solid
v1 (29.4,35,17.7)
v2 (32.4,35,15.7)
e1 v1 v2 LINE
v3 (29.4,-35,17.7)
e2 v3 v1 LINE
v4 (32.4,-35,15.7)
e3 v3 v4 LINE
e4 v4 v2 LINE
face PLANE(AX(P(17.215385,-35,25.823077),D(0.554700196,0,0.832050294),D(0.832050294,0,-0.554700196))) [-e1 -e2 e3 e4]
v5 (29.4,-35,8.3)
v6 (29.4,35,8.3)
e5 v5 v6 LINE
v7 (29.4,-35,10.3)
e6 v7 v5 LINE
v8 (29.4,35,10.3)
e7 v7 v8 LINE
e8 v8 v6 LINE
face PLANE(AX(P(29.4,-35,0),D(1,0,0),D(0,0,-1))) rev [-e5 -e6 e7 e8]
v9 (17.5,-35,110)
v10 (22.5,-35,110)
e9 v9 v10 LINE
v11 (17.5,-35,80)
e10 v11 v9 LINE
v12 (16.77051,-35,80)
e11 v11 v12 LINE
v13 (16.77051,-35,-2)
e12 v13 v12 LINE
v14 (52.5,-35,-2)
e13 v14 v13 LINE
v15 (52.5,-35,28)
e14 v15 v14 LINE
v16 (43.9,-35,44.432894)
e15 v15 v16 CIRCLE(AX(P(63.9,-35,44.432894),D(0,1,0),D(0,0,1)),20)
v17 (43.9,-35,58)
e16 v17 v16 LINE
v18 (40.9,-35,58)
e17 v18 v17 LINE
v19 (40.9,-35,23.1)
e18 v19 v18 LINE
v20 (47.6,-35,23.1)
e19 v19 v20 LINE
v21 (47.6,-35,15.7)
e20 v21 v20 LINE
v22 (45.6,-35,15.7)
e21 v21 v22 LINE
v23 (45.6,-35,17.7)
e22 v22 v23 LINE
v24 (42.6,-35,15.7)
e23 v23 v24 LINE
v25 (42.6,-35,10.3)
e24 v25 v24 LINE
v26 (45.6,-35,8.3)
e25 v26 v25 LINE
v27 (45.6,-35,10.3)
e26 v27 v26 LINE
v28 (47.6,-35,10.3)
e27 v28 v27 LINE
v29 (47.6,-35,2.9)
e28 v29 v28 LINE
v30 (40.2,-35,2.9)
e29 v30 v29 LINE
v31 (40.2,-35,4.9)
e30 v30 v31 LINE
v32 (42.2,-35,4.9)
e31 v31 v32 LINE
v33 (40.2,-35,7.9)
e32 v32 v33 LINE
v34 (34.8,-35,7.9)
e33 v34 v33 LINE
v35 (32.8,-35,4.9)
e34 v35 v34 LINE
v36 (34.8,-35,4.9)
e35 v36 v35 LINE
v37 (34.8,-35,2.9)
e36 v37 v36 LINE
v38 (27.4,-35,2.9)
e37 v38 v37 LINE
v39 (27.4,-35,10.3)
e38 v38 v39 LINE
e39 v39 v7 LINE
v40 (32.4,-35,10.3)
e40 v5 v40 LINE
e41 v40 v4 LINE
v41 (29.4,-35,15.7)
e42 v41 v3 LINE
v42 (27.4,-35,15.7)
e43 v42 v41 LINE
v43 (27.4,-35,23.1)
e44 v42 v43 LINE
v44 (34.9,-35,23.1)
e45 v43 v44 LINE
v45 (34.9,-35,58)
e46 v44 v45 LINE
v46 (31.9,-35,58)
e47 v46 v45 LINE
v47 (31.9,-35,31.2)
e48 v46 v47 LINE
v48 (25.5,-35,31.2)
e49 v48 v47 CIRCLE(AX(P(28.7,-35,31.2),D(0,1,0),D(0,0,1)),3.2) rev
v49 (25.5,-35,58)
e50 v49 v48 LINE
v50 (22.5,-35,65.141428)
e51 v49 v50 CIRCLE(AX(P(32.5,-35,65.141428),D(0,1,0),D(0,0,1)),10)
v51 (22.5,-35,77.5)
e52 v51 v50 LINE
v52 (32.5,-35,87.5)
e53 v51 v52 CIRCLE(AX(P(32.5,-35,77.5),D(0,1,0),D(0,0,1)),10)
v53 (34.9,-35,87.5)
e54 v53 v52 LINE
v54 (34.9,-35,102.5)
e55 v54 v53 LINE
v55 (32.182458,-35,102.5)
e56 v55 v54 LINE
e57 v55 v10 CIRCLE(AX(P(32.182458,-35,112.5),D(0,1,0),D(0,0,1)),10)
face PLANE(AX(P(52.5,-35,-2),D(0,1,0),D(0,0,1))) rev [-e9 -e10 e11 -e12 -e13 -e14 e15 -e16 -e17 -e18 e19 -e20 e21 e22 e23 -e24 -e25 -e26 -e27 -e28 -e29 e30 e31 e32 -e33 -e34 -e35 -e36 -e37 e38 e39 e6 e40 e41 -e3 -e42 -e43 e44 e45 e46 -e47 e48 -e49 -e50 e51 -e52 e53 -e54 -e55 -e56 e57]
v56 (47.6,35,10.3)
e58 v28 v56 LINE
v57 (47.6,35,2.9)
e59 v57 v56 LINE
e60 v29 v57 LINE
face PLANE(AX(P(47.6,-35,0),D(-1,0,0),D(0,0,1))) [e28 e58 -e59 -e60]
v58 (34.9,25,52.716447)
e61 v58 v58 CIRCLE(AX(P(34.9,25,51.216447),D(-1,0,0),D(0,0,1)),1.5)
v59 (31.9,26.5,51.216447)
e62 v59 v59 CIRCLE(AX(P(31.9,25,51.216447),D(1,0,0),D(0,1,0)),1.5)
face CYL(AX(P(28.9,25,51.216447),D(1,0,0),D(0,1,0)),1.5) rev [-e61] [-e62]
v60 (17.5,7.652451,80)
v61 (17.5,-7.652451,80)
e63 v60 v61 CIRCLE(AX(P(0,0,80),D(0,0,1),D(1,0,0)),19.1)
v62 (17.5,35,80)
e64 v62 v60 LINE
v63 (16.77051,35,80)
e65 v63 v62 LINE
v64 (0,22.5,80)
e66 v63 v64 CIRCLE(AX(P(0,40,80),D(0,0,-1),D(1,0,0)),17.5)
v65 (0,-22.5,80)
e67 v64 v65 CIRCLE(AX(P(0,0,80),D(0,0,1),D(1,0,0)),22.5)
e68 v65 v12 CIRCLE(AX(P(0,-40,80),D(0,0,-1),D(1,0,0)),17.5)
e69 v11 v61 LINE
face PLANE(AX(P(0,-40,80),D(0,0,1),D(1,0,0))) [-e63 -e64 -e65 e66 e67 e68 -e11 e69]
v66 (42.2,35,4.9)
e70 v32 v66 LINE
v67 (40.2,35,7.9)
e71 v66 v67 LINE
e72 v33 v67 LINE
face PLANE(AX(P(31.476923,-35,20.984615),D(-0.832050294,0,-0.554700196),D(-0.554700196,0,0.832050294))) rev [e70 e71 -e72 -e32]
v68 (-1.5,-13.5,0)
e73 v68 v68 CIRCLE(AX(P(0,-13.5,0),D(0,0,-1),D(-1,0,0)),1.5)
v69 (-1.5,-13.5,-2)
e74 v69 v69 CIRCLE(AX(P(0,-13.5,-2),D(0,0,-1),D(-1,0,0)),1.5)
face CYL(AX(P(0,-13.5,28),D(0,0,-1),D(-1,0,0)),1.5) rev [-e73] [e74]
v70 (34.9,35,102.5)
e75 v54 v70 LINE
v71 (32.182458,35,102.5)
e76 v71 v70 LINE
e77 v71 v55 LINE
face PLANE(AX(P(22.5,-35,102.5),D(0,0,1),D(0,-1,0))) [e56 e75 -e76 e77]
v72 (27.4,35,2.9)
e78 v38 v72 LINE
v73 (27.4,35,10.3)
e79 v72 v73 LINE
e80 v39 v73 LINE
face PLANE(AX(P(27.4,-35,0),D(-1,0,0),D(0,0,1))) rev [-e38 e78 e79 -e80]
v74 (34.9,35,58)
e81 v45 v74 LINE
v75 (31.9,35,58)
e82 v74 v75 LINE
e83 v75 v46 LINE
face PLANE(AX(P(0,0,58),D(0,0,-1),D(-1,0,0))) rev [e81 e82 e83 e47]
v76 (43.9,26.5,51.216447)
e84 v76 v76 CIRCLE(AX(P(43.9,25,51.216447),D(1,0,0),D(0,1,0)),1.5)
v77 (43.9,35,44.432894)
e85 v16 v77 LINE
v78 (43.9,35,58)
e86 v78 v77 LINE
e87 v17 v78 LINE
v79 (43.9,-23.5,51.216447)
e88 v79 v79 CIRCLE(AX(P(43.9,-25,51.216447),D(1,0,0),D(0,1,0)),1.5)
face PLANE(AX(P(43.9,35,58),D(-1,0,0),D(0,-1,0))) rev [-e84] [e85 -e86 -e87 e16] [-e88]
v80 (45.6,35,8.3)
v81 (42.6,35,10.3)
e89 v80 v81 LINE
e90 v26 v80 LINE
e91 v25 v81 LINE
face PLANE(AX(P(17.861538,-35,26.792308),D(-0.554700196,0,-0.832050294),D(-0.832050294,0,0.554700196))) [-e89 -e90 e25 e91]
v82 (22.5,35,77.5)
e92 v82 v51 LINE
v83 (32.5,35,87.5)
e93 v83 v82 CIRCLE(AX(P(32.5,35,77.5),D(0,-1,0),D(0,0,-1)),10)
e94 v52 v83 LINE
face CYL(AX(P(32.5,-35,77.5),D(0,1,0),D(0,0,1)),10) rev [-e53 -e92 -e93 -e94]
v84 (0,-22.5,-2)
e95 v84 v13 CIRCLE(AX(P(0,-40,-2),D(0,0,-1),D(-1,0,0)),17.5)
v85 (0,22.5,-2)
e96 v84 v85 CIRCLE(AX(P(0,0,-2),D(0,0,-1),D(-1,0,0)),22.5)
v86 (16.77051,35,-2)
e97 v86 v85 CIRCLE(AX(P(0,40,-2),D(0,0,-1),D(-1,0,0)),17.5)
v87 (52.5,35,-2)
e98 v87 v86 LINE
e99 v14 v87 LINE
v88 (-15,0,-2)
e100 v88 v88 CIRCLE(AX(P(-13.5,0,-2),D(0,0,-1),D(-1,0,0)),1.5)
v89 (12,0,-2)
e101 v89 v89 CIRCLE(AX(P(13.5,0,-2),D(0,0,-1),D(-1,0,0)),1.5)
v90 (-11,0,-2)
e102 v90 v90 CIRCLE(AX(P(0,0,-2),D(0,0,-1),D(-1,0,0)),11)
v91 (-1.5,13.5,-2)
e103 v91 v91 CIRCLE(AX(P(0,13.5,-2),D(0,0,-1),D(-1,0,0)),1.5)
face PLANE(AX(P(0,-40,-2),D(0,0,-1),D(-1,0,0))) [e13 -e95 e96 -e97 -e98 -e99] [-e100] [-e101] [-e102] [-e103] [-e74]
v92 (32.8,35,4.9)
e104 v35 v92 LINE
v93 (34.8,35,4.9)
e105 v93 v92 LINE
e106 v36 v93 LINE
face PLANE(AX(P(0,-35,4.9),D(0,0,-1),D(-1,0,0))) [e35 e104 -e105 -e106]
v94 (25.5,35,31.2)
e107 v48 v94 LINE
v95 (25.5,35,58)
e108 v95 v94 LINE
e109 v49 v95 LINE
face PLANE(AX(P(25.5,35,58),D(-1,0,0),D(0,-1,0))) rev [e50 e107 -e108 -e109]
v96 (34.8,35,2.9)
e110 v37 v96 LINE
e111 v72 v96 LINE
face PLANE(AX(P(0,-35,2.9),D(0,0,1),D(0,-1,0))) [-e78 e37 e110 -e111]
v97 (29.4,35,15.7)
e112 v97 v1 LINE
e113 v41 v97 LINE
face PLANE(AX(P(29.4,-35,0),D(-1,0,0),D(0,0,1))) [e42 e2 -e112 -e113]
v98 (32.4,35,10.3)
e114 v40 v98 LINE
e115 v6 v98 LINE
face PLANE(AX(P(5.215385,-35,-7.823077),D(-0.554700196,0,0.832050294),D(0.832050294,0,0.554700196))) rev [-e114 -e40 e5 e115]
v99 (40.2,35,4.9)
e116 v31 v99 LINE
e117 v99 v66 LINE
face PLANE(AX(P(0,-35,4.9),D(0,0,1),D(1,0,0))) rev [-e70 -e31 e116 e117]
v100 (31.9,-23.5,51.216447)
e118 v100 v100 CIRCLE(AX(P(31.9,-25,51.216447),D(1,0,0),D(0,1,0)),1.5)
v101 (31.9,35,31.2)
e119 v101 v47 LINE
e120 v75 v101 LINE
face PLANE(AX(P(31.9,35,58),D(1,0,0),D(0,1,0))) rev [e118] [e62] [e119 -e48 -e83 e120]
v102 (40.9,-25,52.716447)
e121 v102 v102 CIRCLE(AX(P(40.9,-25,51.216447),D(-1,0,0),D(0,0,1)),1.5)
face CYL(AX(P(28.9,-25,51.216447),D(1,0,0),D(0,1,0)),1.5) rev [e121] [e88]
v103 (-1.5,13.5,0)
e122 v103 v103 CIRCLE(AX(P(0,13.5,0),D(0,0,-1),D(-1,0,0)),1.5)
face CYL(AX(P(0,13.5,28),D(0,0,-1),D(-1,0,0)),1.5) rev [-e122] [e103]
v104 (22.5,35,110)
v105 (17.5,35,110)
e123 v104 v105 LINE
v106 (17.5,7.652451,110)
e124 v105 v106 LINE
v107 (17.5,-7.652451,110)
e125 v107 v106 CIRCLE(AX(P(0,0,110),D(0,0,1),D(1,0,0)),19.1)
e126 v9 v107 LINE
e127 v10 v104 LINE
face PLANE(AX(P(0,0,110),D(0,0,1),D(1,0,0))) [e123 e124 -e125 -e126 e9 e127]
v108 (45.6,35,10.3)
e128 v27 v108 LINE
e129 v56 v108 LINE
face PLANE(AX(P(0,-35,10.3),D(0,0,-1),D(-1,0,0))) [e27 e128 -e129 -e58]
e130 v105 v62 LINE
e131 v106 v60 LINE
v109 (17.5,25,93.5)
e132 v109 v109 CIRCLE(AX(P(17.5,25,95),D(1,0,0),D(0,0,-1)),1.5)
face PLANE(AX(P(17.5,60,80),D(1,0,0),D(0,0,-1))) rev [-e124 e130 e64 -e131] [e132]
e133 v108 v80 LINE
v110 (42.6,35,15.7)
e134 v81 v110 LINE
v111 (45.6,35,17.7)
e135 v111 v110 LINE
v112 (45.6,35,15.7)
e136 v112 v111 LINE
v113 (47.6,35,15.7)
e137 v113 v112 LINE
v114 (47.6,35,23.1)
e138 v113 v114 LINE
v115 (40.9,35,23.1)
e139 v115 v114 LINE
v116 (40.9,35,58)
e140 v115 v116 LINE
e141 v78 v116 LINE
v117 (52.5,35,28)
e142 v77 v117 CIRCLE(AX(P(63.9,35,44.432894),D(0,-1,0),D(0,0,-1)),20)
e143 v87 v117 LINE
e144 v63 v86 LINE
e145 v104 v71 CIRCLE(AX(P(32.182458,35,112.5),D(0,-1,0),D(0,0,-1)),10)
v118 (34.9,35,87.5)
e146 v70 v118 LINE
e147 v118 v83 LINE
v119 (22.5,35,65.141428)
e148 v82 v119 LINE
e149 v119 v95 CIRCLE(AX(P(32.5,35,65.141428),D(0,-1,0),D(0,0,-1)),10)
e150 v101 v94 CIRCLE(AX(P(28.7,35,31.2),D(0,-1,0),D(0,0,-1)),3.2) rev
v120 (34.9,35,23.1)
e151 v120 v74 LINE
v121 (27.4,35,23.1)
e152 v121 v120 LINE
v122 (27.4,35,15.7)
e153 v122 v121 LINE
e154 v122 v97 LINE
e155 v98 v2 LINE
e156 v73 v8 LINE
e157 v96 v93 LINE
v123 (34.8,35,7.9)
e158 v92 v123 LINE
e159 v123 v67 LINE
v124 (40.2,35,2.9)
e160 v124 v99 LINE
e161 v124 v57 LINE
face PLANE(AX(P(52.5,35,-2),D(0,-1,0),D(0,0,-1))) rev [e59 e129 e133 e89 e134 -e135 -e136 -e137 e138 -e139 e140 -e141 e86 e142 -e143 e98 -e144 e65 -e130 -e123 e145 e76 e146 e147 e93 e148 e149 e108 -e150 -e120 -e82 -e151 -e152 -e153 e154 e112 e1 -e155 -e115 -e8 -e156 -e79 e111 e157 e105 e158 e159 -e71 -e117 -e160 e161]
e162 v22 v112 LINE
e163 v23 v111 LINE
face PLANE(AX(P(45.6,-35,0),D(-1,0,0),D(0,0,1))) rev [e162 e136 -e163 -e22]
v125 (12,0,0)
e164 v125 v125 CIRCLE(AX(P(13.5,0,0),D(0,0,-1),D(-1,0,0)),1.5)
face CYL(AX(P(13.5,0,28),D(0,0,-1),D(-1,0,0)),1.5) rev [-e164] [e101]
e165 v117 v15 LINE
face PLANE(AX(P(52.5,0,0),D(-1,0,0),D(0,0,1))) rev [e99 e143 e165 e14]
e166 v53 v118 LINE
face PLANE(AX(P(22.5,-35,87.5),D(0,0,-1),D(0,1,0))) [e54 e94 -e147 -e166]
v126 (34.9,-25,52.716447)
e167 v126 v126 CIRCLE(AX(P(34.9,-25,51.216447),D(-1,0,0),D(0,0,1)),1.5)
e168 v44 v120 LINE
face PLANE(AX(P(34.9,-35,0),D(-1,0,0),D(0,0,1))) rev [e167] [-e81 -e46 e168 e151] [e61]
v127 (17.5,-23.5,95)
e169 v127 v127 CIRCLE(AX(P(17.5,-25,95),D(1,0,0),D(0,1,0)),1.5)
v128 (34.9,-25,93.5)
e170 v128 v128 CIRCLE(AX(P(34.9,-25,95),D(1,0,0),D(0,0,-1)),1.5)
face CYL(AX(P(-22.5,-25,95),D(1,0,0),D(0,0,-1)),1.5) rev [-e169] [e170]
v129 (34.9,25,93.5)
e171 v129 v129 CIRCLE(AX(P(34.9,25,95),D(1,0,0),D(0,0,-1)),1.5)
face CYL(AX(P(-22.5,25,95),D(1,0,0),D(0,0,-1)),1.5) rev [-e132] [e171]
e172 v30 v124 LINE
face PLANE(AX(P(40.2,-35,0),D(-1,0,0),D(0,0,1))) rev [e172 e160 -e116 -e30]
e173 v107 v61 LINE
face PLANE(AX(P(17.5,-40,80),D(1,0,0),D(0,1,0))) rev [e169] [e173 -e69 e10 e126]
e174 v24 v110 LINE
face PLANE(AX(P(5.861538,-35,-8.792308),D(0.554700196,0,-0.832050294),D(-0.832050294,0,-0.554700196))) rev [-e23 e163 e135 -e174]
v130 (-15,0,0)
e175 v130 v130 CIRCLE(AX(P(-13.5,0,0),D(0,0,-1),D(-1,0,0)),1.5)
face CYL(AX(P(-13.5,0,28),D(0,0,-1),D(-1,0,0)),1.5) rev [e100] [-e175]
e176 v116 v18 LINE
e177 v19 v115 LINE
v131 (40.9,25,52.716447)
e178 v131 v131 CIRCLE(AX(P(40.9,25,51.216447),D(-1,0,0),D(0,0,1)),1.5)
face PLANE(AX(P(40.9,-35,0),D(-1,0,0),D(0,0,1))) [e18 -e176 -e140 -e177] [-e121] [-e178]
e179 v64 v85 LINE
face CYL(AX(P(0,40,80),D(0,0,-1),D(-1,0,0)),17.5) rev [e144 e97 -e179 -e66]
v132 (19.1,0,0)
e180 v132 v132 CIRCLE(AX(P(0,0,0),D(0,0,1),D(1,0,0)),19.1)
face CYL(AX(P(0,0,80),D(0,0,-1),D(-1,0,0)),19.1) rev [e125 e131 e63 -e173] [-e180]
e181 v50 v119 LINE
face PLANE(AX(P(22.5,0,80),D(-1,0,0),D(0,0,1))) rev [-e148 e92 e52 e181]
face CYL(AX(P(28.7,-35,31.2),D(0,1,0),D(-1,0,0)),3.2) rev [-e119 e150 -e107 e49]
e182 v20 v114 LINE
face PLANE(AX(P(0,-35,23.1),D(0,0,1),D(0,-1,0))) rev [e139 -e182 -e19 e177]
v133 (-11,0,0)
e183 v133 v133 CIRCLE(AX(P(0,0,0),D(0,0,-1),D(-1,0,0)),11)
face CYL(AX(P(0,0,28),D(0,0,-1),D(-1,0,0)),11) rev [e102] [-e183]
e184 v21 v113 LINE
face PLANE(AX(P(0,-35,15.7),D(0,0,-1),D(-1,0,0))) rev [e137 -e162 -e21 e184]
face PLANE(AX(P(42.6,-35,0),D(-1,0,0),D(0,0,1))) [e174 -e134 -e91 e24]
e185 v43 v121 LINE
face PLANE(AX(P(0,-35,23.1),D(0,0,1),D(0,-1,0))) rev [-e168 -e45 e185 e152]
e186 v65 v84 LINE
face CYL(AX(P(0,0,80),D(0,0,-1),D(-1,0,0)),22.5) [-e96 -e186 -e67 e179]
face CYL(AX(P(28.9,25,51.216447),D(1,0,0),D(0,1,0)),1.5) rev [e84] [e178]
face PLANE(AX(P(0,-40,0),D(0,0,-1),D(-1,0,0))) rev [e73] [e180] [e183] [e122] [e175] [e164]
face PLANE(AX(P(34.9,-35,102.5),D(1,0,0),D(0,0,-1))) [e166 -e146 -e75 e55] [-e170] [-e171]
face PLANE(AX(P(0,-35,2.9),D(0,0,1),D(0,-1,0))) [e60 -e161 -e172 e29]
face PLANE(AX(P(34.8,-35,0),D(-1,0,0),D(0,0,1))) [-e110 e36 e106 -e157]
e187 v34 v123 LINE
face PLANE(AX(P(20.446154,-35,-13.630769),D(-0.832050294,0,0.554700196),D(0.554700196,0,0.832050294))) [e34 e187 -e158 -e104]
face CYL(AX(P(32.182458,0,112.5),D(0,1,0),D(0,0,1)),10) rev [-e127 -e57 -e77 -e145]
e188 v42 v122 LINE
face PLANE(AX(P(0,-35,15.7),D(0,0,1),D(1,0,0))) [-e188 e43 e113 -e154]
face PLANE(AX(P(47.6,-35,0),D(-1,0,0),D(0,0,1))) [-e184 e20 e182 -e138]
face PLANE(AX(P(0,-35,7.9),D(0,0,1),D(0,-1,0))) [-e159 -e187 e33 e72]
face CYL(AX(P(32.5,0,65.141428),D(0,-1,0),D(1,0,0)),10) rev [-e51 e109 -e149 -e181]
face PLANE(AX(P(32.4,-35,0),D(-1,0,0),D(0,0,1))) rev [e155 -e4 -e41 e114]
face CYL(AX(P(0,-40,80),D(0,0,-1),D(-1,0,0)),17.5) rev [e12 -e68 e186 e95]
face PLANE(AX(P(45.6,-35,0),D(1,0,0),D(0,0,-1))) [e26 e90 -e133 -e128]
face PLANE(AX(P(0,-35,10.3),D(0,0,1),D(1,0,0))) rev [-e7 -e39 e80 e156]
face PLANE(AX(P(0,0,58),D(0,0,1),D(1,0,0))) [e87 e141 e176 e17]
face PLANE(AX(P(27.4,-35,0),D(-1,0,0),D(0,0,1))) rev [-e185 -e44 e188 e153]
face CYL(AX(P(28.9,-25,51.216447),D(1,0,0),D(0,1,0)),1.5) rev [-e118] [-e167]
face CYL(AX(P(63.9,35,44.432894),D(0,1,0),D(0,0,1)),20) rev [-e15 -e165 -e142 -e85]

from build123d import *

# Parameters (mm, degrees)
SKETCH4_R            = 19.1
BOSS_EXTRUDE4_DEPTH  = 80
BOSS_EXTRUDE5_START  = 2
BOSS_EXTRUDE5_DEPTH  = 2
SKETCH6_R            = 5
CUT_EXTRUDE1_DEPTH   = 2
BOSS_EXTRUDE7_DEPTH  = 30
SKETCH8_R            = 11
CUT_EXTRUDE2_DEPTH   = 30
SKETCH9_R            = 1.5
CUT_EXTRUDE3_DEPTH   = 30
SKETCH11_W           = 5
SKETCH11_H           = 112
BOSS_EXTRUDE8_DEPTH  = 20
SKETCH12_W           = 5
SKETCH12_H           = 112
BOSS_EXTRUDE9_DEPTH  = 20
SKETCH13_R           = 1.5
CUT_EXTRUDE4_DEPTH   = 20
SKETCH14_R           = 1.5
CUT_EXTRUDE5_DEPTH   = 20
SKETCH16_W           = 30
SKETCH16_H           = 70
BOSS_EXTRUDE10_DEPTH = 30
SKETCH21_W           = 6
SKETCH21_H           = 4.9
CUT_EXTRUDE6_DEPTH   = 70
SKETCH23_W           = 3
SKETCH23_H           = 70
BOSS_EXTRUDE11_DEPTH = 30
FILLET5_R            = 3.2
FILLET6_R            = 20
SKETCH26_W           = 112
SKETCH26_H           = 40
CUT_EXTRUDE10_DEPTH  = 15
SKETCH27_W           = 6.865199721
SKETCH27_H           = 6.850856093
SKETCH27_W_2         = 7.923200186
SKETCH27_H_2         = 5.884780205
CUT_EXTRUDE11_DEPTH  = 131.000961535
SKETCH28_W           = 12.4
SKETCH28_H           = 15
BOSS_EXTRUDE12_DEPTH = 70
FILLET7_R            = 10
SKETCH29_R           = 1.5
CUT_EXTRUDE12_DEPTH  = 129.917648132
SKETCH30_R           = 1.5
CUT_EXTRUDE13_DEPTH  = 15
FILLET8_R            = 10


# Some blends are built 0.0001 mm under size
with BuildPart() as part:
    # Sketch4 → Boss-Extrude4 (new body)
    with BuildSketch(Plane.XY):
        with BuildLine():
            Line((22.5, 0), (22.5, -60))
            Line((22.5, -60), (17.5, -60))
            Line((17.5, -60), (17.5, -40))
            ThreePointArc((17.5, -40), (12.374368671, -27.625631329), (0, -22.5))
            ThreePointArc((0, -22.5), (-22.5, 0), (0, 22.5))
            ThreePointArc((0, 22.5), (12.374368671, 27.625631329), (17.5, 40))
            Line((17.5, 40), (17.5, 60))
            Line((17.5, 60), (22.5, 60))
            Line((22.5, 60), (22.5, 0))
        make_face()
        Circle(SKETCH4_R, mode=Mode.SUBTRACT)
    extrude(amount=BOSS_EXTRUDE4_DEPTH)

    # Sketch5 → Boss-Extrude5 (add)
    with BuildSketch(Plane(origin=(0, 0, 0), x_dir=(-1, 0, 0), z_dir=(0, 0, -1)).offset(BOSS_EXTRUDE5_START)):
        with BuildLine():
            Line((-17.5, 60), (-22.5, 60))
            Line((-22.5, 60), (-22.5, -60))
            Line((-22.5, -60), (-17.5, -60))
            Line((-17.5, -60), (-17.5, -40))
            ThreePointArc((-17.5, -40), (-12.374368671, -27.625631329), (0, -22.5))
            ThreePointArc((0, -22.5), (22.5, 0), (0, 22.5))
            ThreePointArc((0, 22.5), (-12.374368671, 27.625631329), (-17.5, 40))
            Line((-17.5, 40), (-17.5, 60))
        make_face()
    extrude(amount=-BOSS_EXTRUDE5_DEPTH)

    # Sketch6 → Cut-Extrude1 (cut)
    with BuildSketch(Plane(origin=(0, 0, -2), x_dir=(-1, 0, 0), z_dir=(0, 0, -1))):
        Circle(SKETCH6_R)
    extrude(amount=-CUT_EXTRUDE1_DEPTH, mode=Mode.SUBTRACT)

    # Sketch7 → Boss-Extrude7 (add)
    with BuildSketch(Plane.XY.offset(80)):
        with BuildLine():
            Line((17.5, 60), (17.5, 7.652450588))
            ThreePointArc((17.5, 7.652450588), (19.1, 0), (17.5, -7.652450588))
            Line((17.5, -7.652450588), (17.5, -60))
            Line((17.5, -60), (22.5, -60))
            Line((22.5, -60), (22.5, 60))
            Line((22.5, 60), (17.5, 60))
        make_face()
    extrude(amount=BOSS_EXTRUDE7_DEPTH)

    # Sketch8 → Cut-Extrude2 (cut)
    with BuildSketch(Plane(origin=(0, 0, -2), x_dir=(-1, 0, 0), z_dir=(0, 0, -1))):
        Circle(SKETCH8_R)
    extrude(amount=-CUT_EXTRUDE2_DEPTH, mode=Mode.SUBTRACT)

    # Sketch9 → Cut-Extrude3 (cut)
    with BuildSketch(Plane(origin=(0, 0, -2), x_dir=(-1, 0, 0), z_dir=(0, 0, -1))):
        with Locations((0, 13.5)):
            Circle(SKETCH9_R)
        with Locations((13.5, 0)):
            Circle(SKETCH9_R)
        with Locations((0, -13.5)):
            Circle(SKETCH9_R)
        with Locations((-13.5, 0)):
            Circle(SKETCH9_R)
    extrude(amount=-CUT_EXTRUDE3_DEPTH, mode=Mode.SUBTRACT)

    # Sketch11 → Boss-Extrude8 (add)
    with BuildSketch(Plane.XZ.offset(60)):
        with Locations((20, 54)):
            Rectangle(SKETCH11_W, SKETCH11_H)
    extrude(amount=BOSS_EXTRUDE8_DEPTH)

    # Sketch12 → Boss-Extrude9 (add)
    with BuildSketch(Plane(origin=(0, 60, 0), x_dir=(1, 0, 0), z_dir=(0, 1, 0))):
        with Locations((20, -54)):
            Rectangle(SKETCH12_W, SKETCH12_H)
    extrude(amount=BOSS_EXTRUDE9_DEPTH)

    # Sketch13 → Cut-Extrude4 (cut)
    with BuildSketch(Plane.ZY.offset(-17.5)):
        with Locations((26, 60)):
            Circle(SKETCH13_R)
        with Locations((54, 60)):
            Circle(SKETCH13_R)
        with Locations((82, 60)):
            Circle(SKETCH13_R)
        with Locations((82, -60)):
            Circle(SKETCH13_R)
        with Locations((54, -60)):
            Circle(SKETCH13_R)
        with Locations((26, -60)):
            Circle(SKETCH13_R)
    extrude(amount=-CUT_EXTRUDE4_DEPTH, mode=Mode.SUBTRACT)

    # Sketch14 → Cut-Extrude5 (cut)
    with BuildSketch(Plane.ZY.offset(-17.5)):
        with Locations((95, 37.652450588)):
            Circle(SKETCH14_R)
        with Locations((95, -37.652450588)):
            Circle(SKETCH14_R)
    extrude(amount=-CUT_EXTRUDE5_DEPTH, mode=Mode.SUBTRACT)

    # Sketch16 → Boss-Extrude10 (add)
    with BuildSketch(Plane(origin=(22.5, 0, 0), x_dir=(0, 0, -1), z_dir=(1, 0, 0))):
        with Locations((-13, 0)):
            Rectangle(SKETCH16_W, SKETCH16_H)
    extrude(amount=BOSS_EXTRUDE10_DEPTH)

    # Sketch21 → Cut-Extrude6 (cut)
    with BuildSketch(Plane(origin=(0, 35, 0), x_dir=(1, 0, 0), z_dir=(0, 1, 0))):
        Polygon((34.8, -2.9), (27.4, -2.9), (27.4, -10.3), (29.4, -10.3), (29.4, -8.3), (32.4, -10.3), (32.4, -15.7), (29.4, -17.7), (29.4, -15.7), (27.4, -15.7), (27.4, -23.1), (34.9, -23.1), (40.9, -23.1), (47.6, -23.1), (47.6, -15.7), (45.6, -15.7), (45.6, -17.7), (42.6, -15.7), (42.6, -10.3), (45.6, -8.3), (45.6, -10.3), (47.6, -10.3), (47.6, -2.9), (40.2, -2.9), (40.2, -4.9), (42.2, -4.9), (40.2, -7.9), (34.8, -7.9), (32.8, -4.9), (34.8, -4.9), align=None)
        with Locations((37.9, -25.55)):
            Rectangle(SKETCH21_W, SKETCH21_H)
    extrude(amount=-CUT_EXTRUDE6_DEPTH, mode=Mode.SUBTRACT)

    # Sketch23 → Boss-Extrude11 (add)
    with BuildSketch(Plane.XY.offset(28)):
        with Locations((42.4, 0)):
            Rectangle(SKETCH23_W, SKETCH23_H)
        with Locations((24, 0)):
            Rectangle(SKETCH23_W, SKETCH23_H)
        with Locations((33.4, 0)):
            Rectangle(SKETCH23_W, SKETCH23_H)
    extrude(amount=BOSS_EXTRUDE11_DEPTH)

    # Fillet5
    fillet5_edges = [part.edges().sort_by_distance(p)[0] for p in [
        (25.5, 0, 28),
        (31.9, 0, 28),
    ]]
    fillet(fillet5_edges, radius=FILLET5_R - 0.0001)  # a hair under: the kernel refuses the full size

    # Fillet6
    # the kernel refuses this fillet: 20 mm, written as the material it adds along each edge
    with BuildSketch(Plane(origin=(43.9, 35, 28), x_dir=(1, 0, 0), z_dir=(0, -1, 0))) as fillet6_piece_1:
        with BuildLine():
            CenterArc((20, 16.432893841), FILLET6_R, 180, 55.249774246)
            Line((0, 16.432893841), (-0.4, 16.432893841))
            Line((-0.4, 16.432893841), (-0.4, 0))
            Line((-0.4, 0), (0, -0.4))
            ThreePointArc((0, -0.4), (4.3, -0.4), (8.372, -0.328657877))
            Line((8.372, -0.328657877), (8.6, 0))
        make_face()
    extrude(amount=70)

    # Sketch26 → Cut-Extrude10 (cut)
    with BuildSketch(Plane.ZY.offset(-17.5)):
        with Locations((54, -60)):
            Rectangle(SKETCH26_W, SKETCH26_H)
        with Locations((54, 60)):
            Rectangle(SKETCH26_W, SKETCH26_H)
    extrude(amount=-CUT_EXTRUDE10_DEPTH, mode=Mode.SUBTRACT)

    # Sketch27 → Cut-Extrude11 (cut, through all)
    with BuildSketch(Plane(origin=(0, 0, -2), x_dir=(-1, 0, 0), z_dir=(0, 0, -1))):
        with Locations((-19.06740014, 38.425428047)):
            Rectangle(SKETCH27_W, SKETCH27_H)
        with Locations((-18.538399907, -37.942390102)):
            Rectangle(SKETCH27_W_2, SKETCH27_H_2)
    extrude(amount=-CUT_EXTRUDE11_DEPTH, mode=Mode.SUBTRACT)

    # Sketch28 → Boss-Extrude12 (add)
    with BuildSketch(Plane(origin=(0, 35, 0), x_dir=(1, 0, 0), z_dir=(0, 1, 0))):
        with Locations((28.7, -95)):
            Rectangle(SKETCH28_W, SKETCH28_H)
    extrude(amount=-BOSS_EXTRUDE12_DEPTH)

    # Fillet7
    # the kernel refuses this fillet: 10 mm, written as the material it adds along each edge
    with BuildSketch(Plane(origin=(22.5, 35, 102.5), x_dir=(0, 0, 1), z_dir=(0, -1, 0))) as fillet7_piece_1:
        with BuildLine():
            CenterArc((10, -9.682458366), FILLET7_R, 104.477512186, 75.522487814)
            Line((0, -9.682458366), (-0.2, -9.682458366))
            Line((-0.2, -9.682458366), (-0.2, 0))
            Line((-0.2, 0), (0, 0.2))
            ThreePointArc((0, 0.2), (3.75, 0.2), (7.45, 0.193649167))
            Line((7.45, 0.193649167), (7.5, 0))
        make_face()
    extrude(amount=70)
    with BuildSketch(Plane(origin=(22.5, 35, 87.5), x_dir=(0, 0, -1), z_dir=(0, -1, 0))) as fillet7_piece_2:
        with BuildLine():
            CenterArc((FILLET7_R, FILLET7_R), FILLET7_R, 180, 90)
            Line((0, FILLET7_R), (-FILLET7_R * 0.02, FILLET7_R))
            Line((-FILLET7_R * 0.02, FILLET7_R), (-FILLET7_R * 0.02, -FILLET7_R * 0.02))
            Line((-FILLET7_R * 0.02, -FILLET7_R * 0.02), (FILLET7_R, -FILLET7_R * 0.02))
            Line((FILLET7_R, -FILLET7_R * 0.02), (FILLET7_R, 0))
        make_face()
    extrude(amount=70)

    # Sketch29 → Cut-Extrude12 (cut, through all)
    with BuildSketch(Plane(origin=(34.9, 0, 0), x_dir=(0, 0, -1), z_dir=(1, 0, 0))):
        with Locations((-95, 25)):
            Circle(SKETCH29_R)
        with Locations((-95, -25)):
            Circle(SKETCH29_R)
    extrude(amount=-CUT_EXTRUDE12_DEPTH, mode=Mode.SUBTRACT)

    # Sketch30 → Cut-Extrude13 (cut)
    with BuildSketch(Plane(origin=(43.9, 0, 0), x_dir=(0, 0, -1), z_dir=(1, 0, 0))):
        with Locations(Location((-51.216446921, 25, 0), (0, 0, 90))):
            Circle(SKETCH30_R)
        with Locations(Location((-51.216446921, -25, 0), (0, 0, 90))):
            Circle(SKETCH30_R)
    extrude(amount=-CUT_EXTRUDE13_DEPTH, mode=Mode.SUBTRACT)

    # Fillet8
    # the kernel refuses this fillet: 10 mm, written as the material it adds along each edge
    with BuildSketch(Plane(origin=(22.5, -35, 58), x_dir=(0, 0, 1), z_dir=(0, 1, 0))) as fillet8_piece_1:
        with BuildLine():
            CenterArc((7.141428429, 10), FILLET8_R, 224.427004001, 45.572995999)
            Line((0, 3), (-0.142828569, 2.86))
            ThreePointArc((-0.142828569, 2.86), (-0.2, 1.5), (-0.2, 0))
            Line((-0.2, 0), (0, -0.2))
            Line((0, -0.2), (7.141428429, -0.2))
            Line((7.141428429, -0.2), (7.141428429, 0))
        make_face()
    extrude(amount=70)


solid = part.part
